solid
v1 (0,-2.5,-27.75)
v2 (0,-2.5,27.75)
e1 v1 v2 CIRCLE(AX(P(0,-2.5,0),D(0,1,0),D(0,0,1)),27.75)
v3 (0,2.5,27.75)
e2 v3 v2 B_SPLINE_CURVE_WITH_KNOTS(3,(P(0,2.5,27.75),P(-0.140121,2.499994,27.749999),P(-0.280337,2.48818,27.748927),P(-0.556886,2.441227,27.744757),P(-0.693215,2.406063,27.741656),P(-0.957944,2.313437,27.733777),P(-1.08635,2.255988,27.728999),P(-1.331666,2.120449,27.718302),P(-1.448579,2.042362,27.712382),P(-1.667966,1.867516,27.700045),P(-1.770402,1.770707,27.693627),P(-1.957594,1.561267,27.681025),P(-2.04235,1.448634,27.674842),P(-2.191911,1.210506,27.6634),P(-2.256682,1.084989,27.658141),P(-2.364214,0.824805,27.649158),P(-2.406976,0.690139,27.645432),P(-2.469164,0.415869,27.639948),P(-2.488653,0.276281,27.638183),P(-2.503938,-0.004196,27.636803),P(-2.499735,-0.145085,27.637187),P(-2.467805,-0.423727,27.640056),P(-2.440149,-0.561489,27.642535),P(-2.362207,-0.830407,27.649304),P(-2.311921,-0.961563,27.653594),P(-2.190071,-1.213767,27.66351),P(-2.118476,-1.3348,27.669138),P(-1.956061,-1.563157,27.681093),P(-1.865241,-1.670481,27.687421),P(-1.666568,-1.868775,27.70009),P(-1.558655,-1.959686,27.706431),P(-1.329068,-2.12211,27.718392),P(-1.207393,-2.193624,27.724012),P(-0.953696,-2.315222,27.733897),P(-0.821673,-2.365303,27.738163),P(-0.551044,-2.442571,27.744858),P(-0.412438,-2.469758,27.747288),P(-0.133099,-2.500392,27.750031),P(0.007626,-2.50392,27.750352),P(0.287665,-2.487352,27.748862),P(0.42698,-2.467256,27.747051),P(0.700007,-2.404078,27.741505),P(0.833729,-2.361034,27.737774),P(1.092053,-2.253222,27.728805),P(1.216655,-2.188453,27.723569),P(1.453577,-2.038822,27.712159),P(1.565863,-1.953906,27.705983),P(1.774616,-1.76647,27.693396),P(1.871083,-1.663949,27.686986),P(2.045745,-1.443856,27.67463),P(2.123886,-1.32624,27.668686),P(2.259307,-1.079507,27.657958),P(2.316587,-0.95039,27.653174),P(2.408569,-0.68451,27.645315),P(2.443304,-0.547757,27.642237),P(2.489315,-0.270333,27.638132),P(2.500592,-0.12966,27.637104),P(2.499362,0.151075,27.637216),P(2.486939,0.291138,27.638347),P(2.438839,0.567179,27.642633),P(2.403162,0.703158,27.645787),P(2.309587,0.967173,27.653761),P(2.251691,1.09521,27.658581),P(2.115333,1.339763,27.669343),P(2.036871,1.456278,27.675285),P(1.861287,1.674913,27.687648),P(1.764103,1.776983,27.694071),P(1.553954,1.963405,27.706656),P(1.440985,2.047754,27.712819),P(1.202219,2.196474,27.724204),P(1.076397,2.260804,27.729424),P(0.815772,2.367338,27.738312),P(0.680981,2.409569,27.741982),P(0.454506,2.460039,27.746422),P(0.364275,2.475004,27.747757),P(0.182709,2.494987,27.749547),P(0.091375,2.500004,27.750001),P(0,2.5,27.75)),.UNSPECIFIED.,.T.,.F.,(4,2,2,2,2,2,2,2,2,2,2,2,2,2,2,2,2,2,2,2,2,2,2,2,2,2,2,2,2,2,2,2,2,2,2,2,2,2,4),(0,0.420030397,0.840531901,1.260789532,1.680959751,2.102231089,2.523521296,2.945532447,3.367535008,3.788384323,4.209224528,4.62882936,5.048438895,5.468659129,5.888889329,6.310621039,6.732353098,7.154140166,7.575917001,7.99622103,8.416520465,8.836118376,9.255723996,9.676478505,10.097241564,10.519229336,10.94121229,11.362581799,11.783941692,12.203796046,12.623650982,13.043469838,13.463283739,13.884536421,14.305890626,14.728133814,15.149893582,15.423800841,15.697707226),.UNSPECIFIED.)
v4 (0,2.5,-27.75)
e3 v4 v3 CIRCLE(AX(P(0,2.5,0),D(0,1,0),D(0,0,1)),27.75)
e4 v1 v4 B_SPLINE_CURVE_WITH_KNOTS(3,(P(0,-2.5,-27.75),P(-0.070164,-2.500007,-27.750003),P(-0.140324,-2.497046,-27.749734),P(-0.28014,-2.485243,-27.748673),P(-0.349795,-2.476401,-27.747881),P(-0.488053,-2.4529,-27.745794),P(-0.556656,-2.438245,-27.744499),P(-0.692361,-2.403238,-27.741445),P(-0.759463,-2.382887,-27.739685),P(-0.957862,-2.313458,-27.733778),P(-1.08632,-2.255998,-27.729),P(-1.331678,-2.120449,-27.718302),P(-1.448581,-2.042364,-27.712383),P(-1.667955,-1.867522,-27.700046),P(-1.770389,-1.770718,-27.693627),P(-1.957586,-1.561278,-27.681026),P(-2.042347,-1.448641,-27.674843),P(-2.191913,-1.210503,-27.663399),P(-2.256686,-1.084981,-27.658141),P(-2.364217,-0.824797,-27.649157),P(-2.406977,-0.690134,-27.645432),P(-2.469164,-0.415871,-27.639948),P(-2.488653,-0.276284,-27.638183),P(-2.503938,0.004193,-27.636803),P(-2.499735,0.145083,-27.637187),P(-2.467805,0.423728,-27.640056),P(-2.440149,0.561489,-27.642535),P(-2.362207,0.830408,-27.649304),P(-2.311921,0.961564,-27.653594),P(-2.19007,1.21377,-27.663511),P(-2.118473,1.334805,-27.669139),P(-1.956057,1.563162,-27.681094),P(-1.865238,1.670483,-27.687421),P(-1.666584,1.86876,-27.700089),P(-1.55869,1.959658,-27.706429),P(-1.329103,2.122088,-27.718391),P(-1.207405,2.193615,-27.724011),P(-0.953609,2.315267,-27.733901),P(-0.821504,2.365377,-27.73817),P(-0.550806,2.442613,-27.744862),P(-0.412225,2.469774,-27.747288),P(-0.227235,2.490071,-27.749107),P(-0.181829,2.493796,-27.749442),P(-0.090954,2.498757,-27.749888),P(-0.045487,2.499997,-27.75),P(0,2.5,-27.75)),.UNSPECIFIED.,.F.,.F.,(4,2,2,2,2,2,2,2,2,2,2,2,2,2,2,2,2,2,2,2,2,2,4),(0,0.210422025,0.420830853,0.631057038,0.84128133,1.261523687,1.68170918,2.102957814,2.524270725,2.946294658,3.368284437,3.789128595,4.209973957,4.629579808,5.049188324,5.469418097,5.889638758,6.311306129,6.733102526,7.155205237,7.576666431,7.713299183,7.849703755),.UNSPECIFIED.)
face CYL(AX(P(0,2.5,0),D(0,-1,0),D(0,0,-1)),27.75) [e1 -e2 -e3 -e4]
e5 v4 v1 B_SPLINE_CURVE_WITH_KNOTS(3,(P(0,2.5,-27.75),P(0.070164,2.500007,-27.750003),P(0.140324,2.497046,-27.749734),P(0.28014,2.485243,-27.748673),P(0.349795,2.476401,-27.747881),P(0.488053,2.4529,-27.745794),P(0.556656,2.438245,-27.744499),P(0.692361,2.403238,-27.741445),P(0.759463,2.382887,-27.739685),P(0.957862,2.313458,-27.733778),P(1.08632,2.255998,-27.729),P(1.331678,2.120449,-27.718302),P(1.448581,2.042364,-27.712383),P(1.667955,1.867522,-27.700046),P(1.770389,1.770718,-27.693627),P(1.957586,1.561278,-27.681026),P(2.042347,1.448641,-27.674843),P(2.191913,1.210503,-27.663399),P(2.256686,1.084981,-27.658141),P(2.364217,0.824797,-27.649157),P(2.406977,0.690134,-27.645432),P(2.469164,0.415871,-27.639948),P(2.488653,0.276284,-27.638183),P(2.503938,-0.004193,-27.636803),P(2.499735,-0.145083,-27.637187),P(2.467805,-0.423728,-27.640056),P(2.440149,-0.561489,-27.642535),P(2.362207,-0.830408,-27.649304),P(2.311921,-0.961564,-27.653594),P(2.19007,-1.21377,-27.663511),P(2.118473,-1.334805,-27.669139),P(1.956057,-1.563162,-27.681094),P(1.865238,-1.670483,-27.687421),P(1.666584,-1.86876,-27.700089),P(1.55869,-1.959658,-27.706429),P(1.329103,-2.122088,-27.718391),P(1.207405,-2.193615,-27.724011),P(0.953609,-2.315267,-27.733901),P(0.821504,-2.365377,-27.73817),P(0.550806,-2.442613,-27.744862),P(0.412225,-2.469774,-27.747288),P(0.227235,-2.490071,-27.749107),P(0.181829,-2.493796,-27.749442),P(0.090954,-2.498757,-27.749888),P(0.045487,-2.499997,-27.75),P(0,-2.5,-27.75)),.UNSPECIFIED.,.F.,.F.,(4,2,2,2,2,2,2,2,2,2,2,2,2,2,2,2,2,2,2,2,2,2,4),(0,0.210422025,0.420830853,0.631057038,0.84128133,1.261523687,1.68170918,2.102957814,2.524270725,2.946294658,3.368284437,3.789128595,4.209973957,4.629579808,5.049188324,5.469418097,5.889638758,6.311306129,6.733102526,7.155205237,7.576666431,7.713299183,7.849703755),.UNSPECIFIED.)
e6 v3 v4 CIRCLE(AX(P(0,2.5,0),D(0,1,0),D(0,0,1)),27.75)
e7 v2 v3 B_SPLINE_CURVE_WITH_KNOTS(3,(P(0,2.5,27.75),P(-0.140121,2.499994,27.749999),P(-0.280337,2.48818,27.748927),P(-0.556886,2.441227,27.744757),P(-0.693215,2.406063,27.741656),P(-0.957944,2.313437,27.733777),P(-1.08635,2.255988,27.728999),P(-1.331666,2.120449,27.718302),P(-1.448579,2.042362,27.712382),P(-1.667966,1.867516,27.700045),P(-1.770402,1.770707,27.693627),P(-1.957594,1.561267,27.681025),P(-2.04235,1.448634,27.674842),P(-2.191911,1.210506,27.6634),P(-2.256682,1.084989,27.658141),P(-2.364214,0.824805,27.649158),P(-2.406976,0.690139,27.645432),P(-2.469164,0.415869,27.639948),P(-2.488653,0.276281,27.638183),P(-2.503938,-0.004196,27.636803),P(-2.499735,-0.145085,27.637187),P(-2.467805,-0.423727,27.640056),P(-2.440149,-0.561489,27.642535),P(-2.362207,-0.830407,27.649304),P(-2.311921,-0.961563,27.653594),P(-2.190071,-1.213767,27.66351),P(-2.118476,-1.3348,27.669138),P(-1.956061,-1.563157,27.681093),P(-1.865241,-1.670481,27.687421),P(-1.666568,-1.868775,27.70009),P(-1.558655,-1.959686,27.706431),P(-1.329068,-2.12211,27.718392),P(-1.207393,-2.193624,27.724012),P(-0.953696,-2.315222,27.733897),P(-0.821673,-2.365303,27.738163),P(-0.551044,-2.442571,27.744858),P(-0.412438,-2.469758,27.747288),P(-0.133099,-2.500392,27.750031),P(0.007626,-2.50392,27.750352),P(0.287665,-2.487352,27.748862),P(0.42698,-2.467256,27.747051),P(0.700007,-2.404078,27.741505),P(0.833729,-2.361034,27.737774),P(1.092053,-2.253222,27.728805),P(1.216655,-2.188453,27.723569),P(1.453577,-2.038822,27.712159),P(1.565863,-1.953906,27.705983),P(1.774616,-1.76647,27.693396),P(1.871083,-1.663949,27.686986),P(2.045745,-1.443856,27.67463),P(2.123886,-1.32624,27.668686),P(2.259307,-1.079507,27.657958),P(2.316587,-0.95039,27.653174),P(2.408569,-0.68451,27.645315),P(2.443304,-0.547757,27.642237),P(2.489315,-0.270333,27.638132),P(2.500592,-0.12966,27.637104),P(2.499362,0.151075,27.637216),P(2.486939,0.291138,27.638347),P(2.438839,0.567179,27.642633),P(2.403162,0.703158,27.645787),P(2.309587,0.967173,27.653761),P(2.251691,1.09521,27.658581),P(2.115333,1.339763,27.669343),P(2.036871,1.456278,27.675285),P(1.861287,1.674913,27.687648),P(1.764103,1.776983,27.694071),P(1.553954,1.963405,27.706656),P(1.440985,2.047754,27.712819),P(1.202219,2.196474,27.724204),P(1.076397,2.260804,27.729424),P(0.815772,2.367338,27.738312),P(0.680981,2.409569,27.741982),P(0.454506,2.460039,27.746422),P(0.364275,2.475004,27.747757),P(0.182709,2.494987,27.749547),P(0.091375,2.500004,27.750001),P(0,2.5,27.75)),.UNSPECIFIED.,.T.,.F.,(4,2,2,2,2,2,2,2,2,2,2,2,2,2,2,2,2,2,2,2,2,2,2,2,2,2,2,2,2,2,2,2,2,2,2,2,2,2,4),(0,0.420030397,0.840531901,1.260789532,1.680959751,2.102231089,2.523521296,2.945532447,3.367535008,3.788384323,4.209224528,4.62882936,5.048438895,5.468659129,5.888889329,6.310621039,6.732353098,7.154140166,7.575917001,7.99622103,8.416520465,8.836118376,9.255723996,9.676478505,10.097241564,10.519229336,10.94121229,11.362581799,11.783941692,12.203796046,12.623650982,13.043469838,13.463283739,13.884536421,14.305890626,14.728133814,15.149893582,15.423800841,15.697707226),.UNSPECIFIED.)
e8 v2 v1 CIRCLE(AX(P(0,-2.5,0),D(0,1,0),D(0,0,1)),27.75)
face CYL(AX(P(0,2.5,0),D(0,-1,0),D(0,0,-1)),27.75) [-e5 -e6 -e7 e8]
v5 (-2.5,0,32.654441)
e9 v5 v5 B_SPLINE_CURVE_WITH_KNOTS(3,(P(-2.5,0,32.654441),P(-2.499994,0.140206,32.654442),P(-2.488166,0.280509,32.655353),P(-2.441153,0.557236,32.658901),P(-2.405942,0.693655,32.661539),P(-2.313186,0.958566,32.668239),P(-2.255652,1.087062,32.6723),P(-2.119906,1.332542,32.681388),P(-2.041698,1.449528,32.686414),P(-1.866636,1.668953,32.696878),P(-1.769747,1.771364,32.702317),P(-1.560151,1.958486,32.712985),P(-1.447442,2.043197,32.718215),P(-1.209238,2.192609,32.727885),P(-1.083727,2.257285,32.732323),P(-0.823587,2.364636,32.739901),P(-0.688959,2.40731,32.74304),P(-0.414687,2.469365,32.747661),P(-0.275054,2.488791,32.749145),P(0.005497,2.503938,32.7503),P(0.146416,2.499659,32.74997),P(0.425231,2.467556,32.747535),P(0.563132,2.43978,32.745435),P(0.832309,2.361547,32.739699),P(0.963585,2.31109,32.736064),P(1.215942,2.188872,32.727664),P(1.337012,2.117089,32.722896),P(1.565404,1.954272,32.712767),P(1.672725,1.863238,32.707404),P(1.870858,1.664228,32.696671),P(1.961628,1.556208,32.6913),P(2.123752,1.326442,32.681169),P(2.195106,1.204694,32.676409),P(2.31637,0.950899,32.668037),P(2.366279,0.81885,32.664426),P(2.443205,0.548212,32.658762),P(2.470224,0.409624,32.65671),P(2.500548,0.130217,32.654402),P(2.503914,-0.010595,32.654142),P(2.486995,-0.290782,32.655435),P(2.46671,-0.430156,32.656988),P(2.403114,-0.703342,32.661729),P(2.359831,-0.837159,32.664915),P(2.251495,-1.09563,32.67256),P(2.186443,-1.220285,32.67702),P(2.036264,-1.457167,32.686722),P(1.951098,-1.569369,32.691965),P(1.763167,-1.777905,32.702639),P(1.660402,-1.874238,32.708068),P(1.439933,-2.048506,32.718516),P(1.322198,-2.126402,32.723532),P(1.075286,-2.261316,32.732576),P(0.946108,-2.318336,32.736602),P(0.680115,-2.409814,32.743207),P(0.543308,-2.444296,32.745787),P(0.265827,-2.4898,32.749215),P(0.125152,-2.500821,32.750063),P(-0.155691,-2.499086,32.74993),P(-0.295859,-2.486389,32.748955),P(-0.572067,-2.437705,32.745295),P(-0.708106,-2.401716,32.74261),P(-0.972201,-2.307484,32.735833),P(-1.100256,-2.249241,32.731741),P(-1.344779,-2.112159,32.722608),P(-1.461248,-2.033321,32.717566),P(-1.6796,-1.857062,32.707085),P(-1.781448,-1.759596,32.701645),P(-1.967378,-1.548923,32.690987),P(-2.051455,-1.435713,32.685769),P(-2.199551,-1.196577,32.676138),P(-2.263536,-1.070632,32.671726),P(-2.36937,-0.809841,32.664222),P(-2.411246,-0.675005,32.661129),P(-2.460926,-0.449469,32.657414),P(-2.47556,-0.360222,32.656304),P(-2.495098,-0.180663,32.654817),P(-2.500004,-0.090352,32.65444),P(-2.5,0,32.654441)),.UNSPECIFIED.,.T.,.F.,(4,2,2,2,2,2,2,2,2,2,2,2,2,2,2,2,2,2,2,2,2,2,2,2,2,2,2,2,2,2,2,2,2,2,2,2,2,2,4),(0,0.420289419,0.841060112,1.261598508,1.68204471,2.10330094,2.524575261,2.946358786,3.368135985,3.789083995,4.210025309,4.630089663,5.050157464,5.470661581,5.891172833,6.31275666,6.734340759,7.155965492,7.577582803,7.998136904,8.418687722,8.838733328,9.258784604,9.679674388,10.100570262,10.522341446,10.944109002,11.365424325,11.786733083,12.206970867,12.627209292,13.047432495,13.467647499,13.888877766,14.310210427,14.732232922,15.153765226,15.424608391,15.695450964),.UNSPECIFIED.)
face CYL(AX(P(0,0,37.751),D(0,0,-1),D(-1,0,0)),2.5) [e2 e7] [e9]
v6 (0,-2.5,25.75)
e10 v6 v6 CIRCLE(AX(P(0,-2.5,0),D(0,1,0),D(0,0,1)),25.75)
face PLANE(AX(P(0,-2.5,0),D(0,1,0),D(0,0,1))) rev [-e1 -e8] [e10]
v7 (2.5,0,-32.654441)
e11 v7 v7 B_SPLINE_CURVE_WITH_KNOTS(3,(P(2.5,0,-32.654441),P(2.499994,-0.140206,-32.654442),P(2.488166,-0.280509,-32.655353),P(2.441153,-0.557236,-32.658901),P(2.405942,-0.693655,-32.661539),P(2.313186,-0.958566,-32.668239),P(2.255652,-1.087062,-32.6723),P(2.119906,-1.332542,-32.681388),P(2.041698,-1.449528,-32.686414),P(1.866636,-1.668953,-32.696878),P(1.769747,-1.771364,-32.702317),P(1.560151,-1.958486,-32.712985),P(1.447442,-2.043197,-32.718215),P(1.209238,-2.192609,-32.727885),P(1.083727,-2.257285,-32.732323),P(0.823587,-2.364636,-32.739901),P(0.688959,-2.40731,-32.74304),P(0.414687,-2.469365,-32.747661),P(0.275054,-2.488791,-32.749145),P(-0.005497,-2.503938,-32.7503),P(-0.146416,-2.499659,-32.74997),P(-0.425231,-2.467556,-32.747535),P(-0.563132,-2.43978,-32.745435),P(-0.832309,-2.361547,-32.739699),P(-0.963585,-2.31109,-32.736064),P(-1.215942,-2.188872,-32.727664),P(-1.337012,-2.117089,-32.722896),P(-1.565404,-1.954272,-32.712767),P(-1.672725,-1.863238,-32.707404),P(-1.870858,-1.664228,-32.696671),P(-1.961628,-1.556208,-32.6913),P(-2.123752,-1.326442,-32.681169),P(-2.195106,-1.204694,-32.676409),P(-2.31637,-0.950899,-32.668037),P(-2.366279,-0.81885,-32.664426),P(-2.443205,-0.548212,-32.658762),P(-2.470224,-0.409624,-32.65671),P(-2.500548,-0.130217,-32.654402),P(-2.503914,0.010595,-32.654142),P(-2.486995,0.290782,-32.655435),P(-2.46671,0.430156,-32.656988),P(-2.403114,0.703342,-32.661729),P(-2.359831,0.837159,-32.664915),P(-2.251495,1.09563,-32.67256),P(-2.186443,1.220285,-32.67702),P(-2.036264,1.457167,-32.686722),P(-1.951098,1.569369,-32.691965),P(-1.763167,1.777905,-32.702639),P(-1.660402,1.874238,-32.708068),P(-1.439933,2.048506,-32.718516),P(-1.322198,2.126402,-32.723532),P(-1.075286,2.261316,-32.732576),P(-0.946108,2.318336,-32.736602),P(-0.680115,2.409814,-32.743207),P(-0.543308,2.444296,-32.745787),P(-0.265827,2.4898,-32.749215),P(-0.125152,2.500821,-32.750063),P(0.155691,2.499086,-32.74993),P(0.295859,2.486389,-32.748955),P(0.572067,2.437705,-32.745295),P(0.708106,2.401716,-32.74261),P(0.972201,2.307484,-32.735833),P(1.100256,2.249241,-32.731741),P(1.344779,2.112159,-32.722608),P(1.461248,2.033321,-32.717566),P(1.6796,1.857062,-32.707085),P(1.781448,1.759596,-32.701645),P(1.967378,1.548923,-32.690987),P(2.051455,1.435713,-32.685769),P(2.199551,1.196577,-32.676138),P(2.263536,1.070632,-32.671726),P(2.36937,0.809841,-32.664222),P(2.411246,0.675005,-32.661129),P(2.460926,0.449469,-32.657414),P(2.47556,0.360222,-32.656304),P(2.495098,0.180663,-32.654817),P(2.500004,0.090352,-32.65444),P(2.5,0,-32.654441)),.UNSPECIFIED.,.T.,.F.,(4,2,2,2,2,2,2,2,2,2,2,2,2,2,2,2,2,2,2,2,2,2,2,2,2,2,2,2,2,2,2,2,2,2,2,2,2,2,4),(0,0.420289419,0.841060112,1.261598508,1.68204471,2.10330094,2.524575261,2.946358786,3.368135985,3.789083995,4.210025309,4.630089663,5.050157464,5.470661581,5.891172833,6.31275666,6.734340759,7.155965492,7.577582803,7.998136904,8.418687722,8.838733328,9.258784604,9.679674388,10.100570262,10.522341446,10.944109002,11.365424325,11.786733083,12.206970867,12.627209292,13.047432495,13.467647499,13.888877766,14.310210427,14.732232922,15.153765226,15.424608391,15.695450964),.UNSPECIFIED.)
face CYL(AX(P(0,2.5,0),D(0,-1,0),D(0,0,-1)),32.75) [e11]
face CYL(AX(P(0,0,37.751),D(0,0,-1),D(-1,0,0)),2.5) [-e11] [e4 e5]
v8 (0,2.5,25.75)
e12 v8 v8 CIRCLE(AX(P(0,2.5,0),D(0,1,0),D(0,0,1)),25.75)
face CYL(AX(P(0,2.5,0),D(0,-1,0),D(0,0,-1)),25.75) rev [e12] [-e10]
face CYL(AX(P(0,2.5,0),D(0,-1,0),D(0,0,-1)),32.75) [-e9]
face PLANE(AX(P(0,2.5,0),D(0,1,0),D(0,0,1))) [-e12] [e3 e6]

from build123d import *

# Parameters (mm, degrees)
SKETCH1_R               = 27.75
SKETCH1_R_2             = 25.75
BOSS_EXTRUDE1_DEPTH     = 2.5
BOSS_EXTRUDE2_START     = -32.750000066
BOSS_EXTRUDE2_OUTLINE_R = 2.5
BOSS_EXTRUDE2_DEPTH     = 65.500000132
BOSS_EXTRUDE2_START_2   = -3
BOSS_EXTRUDE2_2_DEPTH   = 6
CUT_EXTRUDE1_DEPTH      = 43.998546635
CUT_EXTRUDE1_DEPTH_BACK = 43.998546635
SKETCH3_R               = 25.75


with BuildPart() as part:
    # Sketch1 → Boss-Extrude1 (new, symmetric)
    with BuildSketch(Plane(origin=(0, 0, 0), x_dir=(1, 0, 0), z_dir=(0, 1, 0))):
        with Locations(Location((0, 0, 0), (0, 0, 270))):
            Circle(SKETCH1_R)
        with Locations(Location((0, 0, 0), (0, 0, 270))):
            Circle(SKETCH1_R_2, mode=Mode.SUBTRACT)
    extrude(amount=BOSS_EXTRUDE1_DEPTH, both=True)

    # Boss-Extrude2: read off the stored shape, not the designer's step
    # Boss-Extrude2 outline → Boss-Extrude2 (add)
    with BuildSketch(Plane.XY.offset(BOSS_EXTRUDE2_START)):
        Circle(BOSS_EXTRUDE2_OUTLINE_R)
    extrude(amount=BOSS_EXTRUDE2_DEPTH)

    # Boss-Extrude2 2 outline → Boss-Extrude2 2 (cut)
    with BuildSketch(Plane(origin=(0, 0, 0), x_dir=(1, 0, 0), z_dir=(0, 1, 0)).offset(BOSS_EXTRUDE2_START_2)):
        with BuildLine():
            Line((4, -32.539570024), (2.500688791, -32.654387999))
            ThreePointArc((2.500688791, -32.654387999), (1.251258189, -32.726088262), (4.28e-07, -32.75))
            Line((4.28e-07, -32.75), (4, -32.750000066))
            Line((4, -32.750000066), (4, -32.539570024))
        make_face()
        with BuildLine():
            Line((-4, -32.750000066), (4.28e-07, -32.75))
            ThreePointArc((4.28e-07, -32.75), (-1.250913366, -32.726101444), (-2.500001508, -32.654440624))
            Line((-2.500001508, -32.654440624), (-4, -32.539601772))
            Line((-4, -32.539601772), (-4, -32.750000066))
        make_face()
        with BuildLine():
            Line((2.500001316, 32.654440639), (4, 32.539601781))
            Line((4, 32.539601781), (4, 32.750000066))
            Line((4, 32.750000066), (1e-09, 32.75))
            ThreePointArc((1e-09, 32.75), (1.250913484, 32.72610144), (2.500001316, 32.654440639))
        make_face()
        with BuildLine():
            Line((-4, 32.750000066), (-4, 32.539577528))
            Line((-4, 32.539577528), (-2.500526303, 32.654400442))
            ThreePointArc((-2.500526303, 32.654400442), (-1.251176552, 32.726091384), (1e-09, 32.75))
            Line((1e-09, 32.75), (-4, 32.750000066))
        make_face()
    extrude(amount=BOSS_EXTRUDE2_2_DEPTH, mode=Mode.SUBTRACT)

    # Sketch3 → Cut-Extrude1 (cut, two sides: drawn at the far end of the back side and taken through both)
    with BuildSketch(Plane(origin=(0, 0, 0), x_dir=(1, 0, 0), z_dir=(0, 1, 0)).offset(-CUT_EXTRUDE1_DEPTH_BACK)):
        with Locations(Location((0, 0, 0), (0, 0, 270))):
            Circle(SKETCH3_R)
    extrude(amount=CUT_EXTRUDE1_DEPTH + CUT_EXTRUDE1_DEPTH_BACK, mode=Mode.SUBTRACT)


solid = part.part
